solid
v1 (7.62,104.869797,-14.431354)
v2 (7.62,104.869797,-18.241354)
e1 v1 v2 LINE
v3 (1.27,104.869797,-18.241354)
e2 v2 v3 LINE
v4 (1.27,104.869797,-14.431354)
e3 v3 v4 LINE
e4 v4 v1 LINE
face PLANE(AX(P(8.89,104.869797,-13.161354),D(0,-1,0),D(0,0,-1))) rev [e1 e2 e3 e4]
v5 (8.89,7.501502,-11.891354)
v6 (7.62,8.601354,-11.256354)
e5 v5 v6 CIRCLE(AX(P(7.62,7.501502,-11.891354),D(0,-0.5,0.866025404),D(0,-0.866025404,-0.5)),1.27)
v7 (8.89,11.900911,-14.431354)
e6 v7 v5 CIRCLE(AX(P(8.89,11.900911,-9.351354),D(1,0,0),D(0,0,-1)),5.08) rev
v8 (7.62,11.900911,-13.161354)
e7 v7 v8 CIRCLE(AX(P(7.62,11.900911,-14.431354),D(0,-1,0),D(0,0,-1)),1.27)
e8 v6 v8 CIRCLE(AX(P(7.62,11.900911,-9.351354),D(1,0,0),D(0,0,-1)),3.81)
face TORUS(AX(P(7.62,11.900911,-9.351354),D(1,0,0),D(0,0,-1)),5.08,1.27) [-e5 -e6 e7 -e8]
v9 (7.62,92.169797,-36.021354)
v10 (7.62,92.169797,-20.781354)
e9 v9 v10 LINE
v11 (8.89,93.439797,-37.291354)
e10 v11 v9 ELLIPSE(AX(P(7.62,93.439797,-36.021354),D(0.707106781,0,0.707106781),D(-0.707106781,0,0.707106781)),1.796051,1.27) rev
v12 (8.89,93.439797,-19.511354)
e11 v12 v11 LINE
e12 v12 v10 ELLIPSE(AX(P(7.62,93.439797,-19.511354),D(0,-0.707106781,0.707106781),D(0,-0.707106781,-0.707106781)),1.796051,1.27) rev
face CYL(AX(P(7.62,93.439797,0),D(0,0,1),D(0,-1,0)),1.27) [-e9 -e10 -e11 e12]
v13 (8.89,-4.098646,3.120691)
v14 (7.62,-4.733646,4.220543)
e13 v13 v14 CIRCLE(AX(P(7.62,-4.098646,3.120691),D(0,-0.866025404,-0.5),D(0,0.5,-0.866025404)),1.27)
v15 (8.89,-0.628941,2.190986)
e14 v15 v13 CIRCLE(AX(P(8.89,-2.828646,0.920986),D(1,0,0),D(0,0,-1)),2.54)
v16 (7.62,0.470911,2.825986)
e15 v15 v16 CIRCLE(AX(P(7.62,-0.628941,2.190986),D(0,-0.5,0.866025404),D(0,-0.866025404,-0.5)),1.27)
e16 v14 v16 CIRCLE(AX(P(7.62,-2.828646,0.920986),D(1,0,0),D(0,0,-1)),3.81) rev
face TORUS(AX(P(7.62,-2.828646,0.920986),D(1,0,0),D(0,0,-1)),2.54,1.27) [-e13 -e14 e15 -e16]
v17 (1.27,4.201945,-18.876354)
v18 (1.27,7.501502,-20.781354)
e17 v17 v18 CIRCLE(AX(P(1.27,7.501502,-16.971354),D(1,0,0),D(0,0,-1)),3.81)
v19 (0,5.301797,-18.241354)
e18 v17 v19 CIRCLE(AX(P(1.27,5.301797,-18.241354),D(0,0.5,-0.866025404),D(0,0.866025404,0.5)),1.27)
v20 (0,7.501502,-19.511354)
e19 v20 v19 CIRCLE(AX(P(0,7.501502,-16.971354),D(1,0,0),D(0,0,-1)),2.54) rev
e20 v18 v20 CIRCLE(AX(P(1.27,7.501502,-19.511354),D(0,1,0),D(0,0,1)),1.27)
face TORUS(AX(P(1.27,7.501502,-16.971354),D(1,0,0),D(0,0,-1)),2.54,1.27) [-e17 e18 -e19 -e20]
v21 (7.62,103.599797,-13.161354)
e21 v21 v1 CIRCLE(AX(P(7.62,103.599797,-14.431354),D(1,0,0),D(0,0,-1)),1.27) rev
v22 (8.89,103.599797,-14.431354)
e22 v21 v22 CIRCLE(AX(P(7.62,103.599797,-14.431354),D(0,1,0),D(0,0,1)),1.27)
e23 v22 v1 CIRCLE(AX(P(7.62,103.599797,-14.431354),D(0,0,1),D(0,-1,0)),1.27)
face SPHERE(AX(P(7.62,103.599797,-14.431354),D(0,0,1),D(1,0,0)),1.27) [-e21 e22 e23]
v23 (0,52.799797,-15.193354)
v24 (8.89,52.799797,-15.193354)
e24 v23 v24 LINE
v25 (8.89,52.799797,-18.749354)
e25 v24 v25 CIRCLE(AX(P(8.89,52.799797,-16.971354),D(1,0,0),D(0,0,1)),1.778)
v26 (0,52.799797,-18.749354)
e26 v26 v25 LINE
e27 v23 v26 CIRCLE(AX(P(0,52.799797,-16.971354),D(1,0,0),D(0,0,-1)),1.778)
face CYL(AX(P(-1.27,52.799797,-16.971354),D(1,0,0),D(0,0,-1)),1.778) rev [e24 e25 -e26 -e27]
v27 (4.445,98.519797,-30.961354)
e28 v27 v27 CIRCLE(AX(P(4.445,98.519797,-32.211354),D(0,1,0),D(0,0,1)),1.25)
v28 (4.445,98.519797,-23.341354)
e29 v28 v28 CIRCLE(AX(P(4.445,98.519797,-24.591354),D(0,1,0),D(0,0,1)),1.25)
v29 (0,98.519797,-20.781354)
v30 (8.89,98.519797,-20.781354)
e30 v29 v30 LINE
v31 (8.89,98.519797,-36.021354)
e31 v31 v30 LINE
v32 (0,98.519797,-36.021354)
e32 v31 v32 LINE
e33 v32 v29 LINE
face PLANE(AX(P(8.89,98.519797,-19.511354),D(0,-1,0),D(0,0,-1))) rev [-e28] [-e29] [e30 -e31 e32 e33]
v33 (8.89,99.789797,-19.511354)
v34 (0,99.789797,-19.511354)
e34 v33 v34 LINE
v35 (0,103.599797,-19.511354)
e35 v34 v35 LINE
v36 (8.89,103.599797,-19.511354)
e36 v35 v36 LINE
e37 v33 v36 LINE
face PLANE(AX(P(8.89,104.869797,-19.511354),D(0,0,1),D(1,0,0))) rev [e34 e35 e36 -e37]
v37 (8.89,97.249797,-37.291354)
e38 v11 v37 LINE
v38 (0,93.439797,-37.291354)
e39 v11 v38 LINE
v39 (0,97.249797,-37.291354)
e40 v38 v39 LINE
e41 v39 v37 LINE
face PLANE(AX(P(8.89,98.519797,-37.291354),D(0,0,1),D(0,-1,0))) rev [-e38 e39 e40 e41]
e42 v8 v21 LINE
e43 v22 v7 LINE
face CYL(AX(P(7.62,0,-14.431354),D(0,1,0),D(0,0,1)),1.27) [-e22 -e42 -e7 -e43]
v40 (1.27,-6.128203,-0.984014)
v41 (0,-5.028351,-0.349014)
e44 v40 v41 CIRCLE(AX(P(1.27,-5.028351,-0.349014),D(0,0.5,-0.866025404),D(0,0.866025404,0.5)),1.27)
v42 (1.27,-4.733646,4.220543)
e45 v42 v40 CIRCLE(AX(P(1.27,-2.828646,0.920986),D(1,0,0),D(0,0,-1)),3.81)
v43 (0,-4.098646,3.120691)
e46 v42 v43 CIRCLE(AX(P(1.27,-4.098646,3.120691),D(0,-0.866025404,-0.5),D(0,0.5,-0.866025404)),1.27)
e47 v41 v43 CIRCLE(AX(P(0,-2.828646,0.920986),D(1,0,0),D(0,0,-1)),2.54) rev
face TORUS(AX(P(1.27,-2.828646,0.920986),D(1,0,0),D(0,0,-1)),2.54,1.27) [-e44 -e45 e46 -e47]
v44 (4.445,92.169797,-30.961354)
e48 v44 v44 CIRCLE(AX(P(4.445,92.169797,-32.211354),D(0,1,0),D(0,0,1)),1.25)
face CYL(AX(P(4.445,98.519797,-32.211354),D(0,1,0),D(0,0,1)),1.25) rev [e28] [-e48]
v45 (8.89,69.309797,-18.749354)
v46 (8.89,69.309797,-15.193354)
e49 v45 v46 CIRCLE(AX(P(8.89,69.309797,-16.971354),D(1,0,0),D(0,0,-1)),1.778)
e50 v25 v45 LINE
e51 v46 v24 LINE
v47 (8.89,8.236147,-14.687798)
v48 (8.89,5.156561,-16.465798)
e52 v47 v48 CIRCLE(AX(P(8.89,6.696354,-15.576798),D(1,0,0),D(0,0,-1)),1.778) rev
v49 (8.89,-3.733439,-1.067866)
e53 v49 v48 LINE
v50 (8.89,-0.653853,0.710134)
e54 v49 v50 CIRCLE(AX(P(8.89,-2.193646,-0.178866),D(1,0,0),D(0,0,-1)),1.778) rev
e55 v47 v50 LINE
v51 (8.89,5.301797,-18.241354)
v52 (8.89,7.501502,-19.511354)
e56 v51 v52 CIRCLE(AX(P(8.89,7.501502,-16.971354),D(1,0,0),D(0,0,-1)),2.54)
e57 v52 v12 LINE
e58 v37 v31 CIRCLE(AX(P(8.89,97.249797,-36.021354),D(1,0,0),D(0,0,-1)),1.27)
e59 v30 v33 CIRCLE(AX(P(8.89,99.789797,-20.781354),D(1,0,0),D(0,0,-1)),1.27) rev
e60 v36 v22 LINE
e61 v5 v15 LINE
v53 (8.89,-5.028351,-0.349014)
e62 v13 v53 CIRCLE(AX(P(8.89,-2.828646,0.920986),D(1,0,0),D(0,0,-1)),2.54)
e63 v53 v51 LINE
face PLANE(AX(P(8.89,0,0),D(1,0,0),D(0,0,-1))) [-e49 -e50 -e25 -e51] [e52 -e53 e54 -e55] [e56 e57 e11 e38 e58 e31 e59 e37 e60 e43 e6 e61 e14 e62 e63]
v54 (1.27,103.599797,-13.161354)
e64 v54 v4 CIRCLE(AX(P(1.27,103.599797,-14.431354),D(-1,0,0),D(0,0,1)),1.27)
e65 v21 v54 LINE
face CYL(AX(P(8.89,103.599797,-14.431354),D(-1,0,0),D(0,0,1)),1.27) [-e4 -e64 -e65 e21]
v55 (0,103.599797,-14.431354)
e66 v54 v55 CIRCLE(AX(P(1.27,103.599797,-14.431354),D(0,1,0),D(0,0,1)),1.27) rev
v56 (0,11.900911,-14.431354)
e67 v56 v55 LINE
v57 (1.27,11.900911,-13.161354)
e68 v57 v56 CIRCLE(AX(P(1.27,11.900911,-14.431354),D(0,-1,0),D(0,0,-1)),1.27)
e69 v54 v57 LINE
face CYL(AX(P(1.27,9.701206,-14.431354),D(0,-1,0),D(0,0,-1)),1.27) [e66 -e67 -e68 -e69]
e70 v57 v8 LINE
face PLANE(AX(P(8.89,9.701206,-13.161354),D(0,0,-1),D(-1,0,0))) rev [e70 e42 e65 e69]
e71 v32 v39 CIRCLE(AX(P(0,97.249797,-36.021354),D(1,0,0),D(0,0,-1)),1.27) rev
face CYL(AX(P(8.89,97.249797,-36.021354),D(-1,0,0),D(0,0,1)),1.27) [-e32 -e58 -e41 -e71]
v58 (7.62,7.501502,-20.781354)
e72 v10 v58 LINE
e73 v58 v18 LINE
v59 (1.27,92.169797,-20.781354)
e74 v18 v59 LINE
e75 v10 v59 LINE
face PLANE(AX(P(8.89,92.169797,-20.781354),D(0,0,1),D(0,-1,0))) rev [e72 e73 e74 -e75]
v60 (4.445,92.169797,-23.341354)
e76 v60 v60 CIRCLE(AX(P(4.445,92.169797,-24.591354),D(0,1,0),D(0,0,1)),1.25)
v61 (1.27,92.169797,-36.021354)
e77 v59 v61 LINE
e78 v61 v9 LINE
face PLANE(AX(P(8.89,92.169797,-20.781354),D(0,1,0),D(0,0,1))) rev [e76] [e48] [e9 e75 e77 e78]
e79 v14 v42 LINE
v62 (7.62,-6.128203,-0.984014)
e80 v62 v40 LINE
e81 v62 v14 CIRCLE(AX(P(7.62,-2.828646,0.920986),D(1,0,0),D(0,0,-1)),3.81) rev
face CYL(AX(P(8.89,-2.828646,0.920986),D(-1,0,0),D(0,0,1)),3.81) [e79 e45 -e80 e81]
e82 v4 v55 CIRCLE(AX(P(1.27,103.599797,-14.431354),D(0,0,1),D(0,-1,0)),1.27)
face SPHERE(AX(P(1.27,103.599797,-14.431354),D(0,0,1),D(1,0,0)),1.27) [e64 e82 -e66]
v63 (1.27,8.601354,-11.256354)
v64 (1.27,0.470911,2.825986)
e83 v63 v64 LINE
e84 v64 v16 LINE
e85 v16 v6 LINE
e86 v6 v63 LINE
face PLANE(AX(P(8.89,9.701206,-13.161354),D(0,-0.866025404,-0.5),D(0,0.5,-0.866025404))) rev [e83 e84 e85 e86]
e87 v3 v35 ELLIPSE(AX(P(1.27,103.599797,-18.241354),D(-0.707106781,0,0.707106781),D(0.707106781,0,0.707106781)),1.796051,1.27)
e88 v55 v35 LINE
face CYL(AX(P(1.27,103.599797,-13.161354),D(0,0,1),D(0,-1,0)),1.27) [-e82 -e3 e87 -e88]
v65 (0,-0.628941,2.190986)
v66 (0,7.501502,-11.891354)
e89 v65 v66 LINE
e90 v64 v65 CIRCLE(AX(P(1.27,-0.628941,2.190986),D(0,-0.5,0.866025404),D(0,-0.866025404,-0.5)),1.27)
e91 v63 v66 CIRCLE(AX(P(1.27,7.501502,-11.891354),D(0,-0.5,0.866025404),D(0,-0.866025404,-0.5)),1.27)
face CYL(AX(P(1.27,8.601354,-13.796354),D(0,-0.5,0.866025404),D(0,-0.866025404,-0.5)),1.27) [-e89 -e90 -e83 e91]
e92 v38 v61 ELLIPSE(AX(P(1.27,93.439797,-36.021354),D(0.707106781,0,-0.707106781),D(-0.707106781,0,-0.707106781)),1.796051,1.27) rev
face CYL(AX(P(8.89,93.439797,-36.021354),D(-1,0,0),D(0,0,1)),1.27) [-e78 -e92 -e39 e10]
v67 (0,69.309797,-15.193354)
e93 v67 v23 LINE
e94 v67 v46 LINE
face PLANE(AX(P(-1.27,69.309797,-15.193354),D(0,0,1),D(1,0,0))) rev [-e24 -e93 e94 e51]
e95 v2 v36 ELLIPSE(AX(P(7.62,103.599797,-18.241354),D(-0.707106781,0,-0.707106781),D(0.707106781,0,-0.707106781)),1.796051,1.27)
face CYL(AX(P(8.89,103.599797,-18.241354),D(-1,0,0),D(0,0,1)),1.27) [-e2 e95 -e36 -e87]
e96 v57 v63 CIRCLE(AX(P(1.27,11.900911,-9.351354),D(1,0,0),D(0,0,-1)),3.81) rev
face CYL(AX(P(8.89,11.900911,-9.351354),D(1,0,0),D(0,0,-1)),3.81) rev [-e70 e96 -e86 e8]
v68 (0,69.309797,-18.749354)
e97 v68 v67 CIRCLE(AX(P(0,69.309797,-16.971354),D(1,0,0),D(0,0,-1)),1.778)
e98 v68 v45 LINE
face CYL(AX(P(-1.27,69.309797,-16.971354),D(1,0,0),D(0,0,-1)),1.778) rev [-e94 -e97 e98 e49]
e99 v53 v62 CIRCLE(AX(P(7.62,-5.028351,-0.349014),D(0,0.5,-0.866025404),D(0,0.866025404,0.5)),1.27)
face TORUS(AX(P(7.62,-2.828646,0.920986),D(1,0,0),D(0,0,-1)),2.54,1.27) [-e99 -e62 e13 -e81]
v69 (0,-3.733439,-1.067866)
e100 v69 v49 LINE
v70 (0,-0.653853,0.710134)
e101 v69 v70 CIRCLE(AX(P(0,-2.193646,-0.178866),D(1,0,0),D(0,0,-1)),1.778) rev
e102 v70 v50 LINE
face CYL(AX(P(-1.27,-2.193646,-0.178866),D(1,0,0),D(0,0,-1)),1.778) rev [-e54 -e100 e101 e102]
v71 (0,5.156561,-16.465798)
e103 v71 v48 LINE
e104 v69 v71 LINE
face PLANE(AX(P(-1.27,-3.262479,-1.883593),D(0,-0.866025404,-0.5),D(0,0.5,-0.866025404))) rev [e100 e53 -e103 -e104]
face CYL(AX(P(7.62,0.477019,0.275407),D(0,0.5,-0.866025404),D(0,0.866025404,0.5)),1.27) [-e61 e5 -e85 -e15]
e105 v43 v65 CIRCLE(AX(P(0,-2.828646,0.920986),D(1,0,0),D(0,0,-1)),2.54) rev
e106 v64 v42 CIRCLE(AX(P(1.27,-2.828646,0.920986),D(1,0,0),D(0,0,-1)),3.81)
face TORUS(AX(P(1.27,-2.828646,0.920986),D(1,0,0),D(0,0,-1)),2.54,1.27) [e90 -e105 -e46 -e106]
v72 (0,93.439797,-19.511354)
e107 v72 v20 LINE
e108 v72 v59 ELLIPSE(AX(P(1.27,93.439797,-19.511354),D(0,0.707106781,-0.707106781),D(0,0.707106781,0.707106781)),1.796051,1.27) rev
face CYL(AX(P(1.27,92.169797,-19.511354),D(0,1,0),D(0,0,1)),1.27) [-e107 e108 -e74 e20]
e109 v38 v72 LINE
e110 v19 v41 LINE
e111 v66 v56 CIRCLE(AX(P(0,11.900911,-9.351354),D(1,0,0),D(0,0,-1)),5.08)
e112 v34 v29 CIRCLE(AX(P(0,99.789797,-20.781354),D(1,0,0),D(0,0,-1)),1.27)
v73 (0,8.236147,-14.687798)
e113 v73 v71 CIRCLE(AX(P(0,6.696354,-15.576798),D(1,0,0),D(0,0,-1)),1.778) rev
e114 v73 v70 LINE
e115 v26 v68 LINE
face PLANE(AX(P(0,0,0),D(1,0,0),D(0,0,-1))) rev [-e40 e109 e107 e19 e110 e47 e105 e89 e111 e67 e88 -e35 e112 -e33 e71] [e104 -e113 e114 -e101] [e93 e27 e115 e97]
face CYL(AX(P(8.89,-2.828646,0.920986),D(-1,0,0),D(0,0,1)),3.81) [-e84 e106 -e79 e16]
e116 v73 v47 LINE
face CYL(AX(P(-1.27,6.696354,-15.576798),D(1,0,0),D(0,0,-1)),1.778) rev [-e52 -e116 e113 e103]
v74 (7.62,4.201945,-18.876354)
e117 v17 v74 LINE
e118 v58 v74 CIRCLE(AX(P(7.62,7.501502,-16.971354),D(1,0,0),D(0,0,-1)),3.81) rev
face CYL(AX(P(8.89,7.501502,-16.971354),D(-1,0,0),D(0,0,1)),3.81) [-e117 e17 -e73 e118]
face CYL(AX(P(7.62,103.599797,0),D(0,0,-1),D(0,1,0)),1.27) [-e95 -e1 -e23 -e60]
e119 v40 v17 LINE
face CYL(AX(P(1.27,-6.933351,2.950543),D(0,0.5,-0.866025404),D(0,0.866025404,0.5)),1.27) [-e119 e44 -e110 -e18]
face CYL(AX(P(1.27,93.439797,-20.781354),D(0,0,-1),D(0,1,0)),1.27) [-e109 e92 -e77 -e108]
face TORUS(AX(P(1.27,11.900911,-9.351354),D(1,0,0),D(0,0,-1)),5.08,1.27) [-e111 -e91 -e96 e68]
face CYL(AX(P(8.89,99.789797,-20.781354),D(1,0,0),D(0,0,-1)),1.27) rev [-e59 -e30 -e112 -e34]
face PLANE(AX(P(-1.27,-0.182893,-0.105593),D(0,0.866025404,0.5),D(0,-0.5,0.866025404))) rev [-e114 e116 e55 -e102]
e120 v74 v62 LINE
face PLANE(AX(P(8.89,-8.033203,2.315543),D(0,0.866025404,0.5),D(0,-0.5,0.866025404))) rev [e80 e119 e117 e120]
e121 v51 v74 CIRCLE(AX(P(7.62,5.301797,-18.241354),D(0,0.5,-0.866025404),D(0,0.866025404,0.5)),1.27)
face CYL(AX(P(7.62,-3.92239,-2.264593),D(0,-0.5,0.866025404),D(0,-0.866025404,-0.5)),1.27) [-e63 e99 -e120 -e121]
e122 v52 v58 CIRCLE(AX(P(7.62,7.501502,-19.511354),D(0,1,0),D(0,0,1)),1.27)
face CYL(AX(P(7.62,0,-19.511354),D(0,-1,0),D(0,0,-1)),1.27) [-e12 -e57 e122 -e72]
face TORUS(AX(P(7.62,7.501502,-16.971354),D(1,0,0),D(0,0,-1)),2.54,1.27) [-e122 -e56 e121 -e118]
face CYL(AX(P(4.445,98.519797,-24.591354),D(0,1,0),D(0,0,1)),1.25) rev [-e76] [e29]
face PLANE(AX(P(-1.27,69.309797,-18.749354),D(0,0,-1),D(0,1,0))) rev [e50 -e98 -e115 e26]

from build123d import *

# Parameters (mm, degrees)
BOSS_EXTRUDE1_DEPTH     = 8.89
CUT_EXTRUDE1_DEPTH      = 10.16
CUT_EXTRUDE2_DEPTH      = 10.16
TAP_DRILL_FOR_M3_TAP1_D = 2.5
FILLET5_R               = 1.27
FILLET6_R               = 3.81
FILLET7_R               = 1.27


with BuildPart() as part:
    # Sketch1 → Boss-Extrude1 (new body)
    with BuildSketch(Plane(origin=(0, 0, 0), x_dir=(0, 0, -1), z_dir=(1, 0, 0))):
        Polygon((-2.31554316, -8.033202767), (20.781354359, 5.301797233), (20.781354359, 92.169797233), (37.291354359, 92.169797233), (37.291354359, 98.519797233), (19.511354359, 98.519797233), (19.511354359, 104.869797233), (13.161354359, 104.869797233), (13.161354359, 9.701206284), (-6.12554316, -1.43408919), align=None)
    extrude(amount=BOSS_EXTRUDE1_DEPTH)

    # Sketch2 → Cut-Extrude1 (cut)
    with BuildSketch(Plane(origin=(8.89, 0, 0), x_dir=(0, 0, -1), z_dir=(1, 0, 0))):
        with BuildLine():
            Line((1.067865891, -3.733439147), (16.465797571, 5.156560853))
            ThreePointArc((16.465797571, 5.156560853), (17.116590739, 7.585354021), (14.687797571, 8.236147189))
            Line((14.687797571, 8.236147189), (-0.710134109, -0.653852811))
            ThreePointArc((-0.710134109, -0.653852811), (-1.360927276, -3.082645979), (1.067865891, -3.733439147))
        make_face()
    extrude(amount=-CUT_EXTRUDE1_DEPTH, mode=Mode.SUBTRACT)

    # Sketch3 → Cut-Extrude2 (cut)
    with BuildSketch(Plane(origin=(8.89, 0, 0), x_dir=(0, 0, -1), z_dir=(1, 0, 0))):
        with BuildLine():
            Line((15.193354359, 69.309797233), (15.193354359, 52.799797233))
            ThreePointArc((15.193354359, 52.799797233), (16.971354359, 51.021797233), (18.749354359, 52.799797233))
            Line((18.749354359, 52.799797233), (18.749354359, 69.309797233))
            ThreePointArc((18.749354359, 69.309797233), (16.971354359, 71.087797233), (15.193354359, 69.309797233))
        make_face()
    extrude(amount=-CUT_EXTRUDE2_DEPTH, mode=Mode.SUBTRACT)

    # Tap Drill for M3 Tap1 (through all)
    with Locations(Plane(origin=(0, 98.519797233, 0), x_dir=(1, 0, 0), z_dir=(0, 1, 0))):
        with Locations((4.445, 32.211354359), (4.445, 24.591354359)):
            Hole(TAP_DRILL_FOR_M3_TAP1_D / 2)

    # Fillet5
    fillet5_edges = [part.edges().sort_by_distance(p)[0] for p in [
        (4.445, 98.519797233, -19.511354359),
        (4.445, 98.519797233, -37.291354359),
    ]]
    fillet(fillet5_edges, radius=FILLET5_R)

    # Fillet6
    fillet6_edges = [part.edges().sort_by_distance(p)[0] for p in [
        (4.445, 9.701206284, -13.161354359),
        (4.445, 5.301797233, -20.781354359),
        (4.445, -8.033202767, 2.31554316),
        (4.445, -1.43408919, 6.12554316),
    ]]
    fillet(fillet6_edges, radius=FILLET6_R - 0.0001)  # a hair under: the kernel refuses the full size

    # Fillet7
    fillet7_edges = [part.edges().sort_by_distance(p)[0] for p in [
        (8.89, 5.596494023, -20.270924545),
        (0, 9.995903075, -12.650924545),
        (8.89, 9.995903075, -12.650924545),
        (0, 104.869797233, -16.336354359),
        (0, 92.169797233, -29.036354359),
        (8.89, 92.169797233, -29.036354359),
        (4.445, 104.869797233, -13.161354359),
        (4.445, 104.869797233, -19.511354359),
        (4.445, 92.169797233, -37.291354359),
        (8.89, 104.869797233, -16.336354359),
        (8.89, 58.385325154, -13.161354359),
        (0, 4.536121849, -4.215165693),
        (8.89, 4.536121849, -4.215165693),
        (0, 49.835620628, -20.781354359),
        (8.89, 49.835620628, -20.781354359),
        (0, -0.963139465, -9.930165693),
        (0, -1.842534696, 4.601203779),
        (0, -6.508863387, 1.907097654),
        (0, 5.596494023, -20.270924545),
        (0, 58.385325154, -13.161354359),
        (8.89, -0.963139465, -9.930165693),
        (8.89, -1.842534696, 4.601203779),
        (8.89, -6.508863387, 1.907097654),
    ]]
    fillet(fillet7_edges, radius=FILLET7_R)


solid = part.part
